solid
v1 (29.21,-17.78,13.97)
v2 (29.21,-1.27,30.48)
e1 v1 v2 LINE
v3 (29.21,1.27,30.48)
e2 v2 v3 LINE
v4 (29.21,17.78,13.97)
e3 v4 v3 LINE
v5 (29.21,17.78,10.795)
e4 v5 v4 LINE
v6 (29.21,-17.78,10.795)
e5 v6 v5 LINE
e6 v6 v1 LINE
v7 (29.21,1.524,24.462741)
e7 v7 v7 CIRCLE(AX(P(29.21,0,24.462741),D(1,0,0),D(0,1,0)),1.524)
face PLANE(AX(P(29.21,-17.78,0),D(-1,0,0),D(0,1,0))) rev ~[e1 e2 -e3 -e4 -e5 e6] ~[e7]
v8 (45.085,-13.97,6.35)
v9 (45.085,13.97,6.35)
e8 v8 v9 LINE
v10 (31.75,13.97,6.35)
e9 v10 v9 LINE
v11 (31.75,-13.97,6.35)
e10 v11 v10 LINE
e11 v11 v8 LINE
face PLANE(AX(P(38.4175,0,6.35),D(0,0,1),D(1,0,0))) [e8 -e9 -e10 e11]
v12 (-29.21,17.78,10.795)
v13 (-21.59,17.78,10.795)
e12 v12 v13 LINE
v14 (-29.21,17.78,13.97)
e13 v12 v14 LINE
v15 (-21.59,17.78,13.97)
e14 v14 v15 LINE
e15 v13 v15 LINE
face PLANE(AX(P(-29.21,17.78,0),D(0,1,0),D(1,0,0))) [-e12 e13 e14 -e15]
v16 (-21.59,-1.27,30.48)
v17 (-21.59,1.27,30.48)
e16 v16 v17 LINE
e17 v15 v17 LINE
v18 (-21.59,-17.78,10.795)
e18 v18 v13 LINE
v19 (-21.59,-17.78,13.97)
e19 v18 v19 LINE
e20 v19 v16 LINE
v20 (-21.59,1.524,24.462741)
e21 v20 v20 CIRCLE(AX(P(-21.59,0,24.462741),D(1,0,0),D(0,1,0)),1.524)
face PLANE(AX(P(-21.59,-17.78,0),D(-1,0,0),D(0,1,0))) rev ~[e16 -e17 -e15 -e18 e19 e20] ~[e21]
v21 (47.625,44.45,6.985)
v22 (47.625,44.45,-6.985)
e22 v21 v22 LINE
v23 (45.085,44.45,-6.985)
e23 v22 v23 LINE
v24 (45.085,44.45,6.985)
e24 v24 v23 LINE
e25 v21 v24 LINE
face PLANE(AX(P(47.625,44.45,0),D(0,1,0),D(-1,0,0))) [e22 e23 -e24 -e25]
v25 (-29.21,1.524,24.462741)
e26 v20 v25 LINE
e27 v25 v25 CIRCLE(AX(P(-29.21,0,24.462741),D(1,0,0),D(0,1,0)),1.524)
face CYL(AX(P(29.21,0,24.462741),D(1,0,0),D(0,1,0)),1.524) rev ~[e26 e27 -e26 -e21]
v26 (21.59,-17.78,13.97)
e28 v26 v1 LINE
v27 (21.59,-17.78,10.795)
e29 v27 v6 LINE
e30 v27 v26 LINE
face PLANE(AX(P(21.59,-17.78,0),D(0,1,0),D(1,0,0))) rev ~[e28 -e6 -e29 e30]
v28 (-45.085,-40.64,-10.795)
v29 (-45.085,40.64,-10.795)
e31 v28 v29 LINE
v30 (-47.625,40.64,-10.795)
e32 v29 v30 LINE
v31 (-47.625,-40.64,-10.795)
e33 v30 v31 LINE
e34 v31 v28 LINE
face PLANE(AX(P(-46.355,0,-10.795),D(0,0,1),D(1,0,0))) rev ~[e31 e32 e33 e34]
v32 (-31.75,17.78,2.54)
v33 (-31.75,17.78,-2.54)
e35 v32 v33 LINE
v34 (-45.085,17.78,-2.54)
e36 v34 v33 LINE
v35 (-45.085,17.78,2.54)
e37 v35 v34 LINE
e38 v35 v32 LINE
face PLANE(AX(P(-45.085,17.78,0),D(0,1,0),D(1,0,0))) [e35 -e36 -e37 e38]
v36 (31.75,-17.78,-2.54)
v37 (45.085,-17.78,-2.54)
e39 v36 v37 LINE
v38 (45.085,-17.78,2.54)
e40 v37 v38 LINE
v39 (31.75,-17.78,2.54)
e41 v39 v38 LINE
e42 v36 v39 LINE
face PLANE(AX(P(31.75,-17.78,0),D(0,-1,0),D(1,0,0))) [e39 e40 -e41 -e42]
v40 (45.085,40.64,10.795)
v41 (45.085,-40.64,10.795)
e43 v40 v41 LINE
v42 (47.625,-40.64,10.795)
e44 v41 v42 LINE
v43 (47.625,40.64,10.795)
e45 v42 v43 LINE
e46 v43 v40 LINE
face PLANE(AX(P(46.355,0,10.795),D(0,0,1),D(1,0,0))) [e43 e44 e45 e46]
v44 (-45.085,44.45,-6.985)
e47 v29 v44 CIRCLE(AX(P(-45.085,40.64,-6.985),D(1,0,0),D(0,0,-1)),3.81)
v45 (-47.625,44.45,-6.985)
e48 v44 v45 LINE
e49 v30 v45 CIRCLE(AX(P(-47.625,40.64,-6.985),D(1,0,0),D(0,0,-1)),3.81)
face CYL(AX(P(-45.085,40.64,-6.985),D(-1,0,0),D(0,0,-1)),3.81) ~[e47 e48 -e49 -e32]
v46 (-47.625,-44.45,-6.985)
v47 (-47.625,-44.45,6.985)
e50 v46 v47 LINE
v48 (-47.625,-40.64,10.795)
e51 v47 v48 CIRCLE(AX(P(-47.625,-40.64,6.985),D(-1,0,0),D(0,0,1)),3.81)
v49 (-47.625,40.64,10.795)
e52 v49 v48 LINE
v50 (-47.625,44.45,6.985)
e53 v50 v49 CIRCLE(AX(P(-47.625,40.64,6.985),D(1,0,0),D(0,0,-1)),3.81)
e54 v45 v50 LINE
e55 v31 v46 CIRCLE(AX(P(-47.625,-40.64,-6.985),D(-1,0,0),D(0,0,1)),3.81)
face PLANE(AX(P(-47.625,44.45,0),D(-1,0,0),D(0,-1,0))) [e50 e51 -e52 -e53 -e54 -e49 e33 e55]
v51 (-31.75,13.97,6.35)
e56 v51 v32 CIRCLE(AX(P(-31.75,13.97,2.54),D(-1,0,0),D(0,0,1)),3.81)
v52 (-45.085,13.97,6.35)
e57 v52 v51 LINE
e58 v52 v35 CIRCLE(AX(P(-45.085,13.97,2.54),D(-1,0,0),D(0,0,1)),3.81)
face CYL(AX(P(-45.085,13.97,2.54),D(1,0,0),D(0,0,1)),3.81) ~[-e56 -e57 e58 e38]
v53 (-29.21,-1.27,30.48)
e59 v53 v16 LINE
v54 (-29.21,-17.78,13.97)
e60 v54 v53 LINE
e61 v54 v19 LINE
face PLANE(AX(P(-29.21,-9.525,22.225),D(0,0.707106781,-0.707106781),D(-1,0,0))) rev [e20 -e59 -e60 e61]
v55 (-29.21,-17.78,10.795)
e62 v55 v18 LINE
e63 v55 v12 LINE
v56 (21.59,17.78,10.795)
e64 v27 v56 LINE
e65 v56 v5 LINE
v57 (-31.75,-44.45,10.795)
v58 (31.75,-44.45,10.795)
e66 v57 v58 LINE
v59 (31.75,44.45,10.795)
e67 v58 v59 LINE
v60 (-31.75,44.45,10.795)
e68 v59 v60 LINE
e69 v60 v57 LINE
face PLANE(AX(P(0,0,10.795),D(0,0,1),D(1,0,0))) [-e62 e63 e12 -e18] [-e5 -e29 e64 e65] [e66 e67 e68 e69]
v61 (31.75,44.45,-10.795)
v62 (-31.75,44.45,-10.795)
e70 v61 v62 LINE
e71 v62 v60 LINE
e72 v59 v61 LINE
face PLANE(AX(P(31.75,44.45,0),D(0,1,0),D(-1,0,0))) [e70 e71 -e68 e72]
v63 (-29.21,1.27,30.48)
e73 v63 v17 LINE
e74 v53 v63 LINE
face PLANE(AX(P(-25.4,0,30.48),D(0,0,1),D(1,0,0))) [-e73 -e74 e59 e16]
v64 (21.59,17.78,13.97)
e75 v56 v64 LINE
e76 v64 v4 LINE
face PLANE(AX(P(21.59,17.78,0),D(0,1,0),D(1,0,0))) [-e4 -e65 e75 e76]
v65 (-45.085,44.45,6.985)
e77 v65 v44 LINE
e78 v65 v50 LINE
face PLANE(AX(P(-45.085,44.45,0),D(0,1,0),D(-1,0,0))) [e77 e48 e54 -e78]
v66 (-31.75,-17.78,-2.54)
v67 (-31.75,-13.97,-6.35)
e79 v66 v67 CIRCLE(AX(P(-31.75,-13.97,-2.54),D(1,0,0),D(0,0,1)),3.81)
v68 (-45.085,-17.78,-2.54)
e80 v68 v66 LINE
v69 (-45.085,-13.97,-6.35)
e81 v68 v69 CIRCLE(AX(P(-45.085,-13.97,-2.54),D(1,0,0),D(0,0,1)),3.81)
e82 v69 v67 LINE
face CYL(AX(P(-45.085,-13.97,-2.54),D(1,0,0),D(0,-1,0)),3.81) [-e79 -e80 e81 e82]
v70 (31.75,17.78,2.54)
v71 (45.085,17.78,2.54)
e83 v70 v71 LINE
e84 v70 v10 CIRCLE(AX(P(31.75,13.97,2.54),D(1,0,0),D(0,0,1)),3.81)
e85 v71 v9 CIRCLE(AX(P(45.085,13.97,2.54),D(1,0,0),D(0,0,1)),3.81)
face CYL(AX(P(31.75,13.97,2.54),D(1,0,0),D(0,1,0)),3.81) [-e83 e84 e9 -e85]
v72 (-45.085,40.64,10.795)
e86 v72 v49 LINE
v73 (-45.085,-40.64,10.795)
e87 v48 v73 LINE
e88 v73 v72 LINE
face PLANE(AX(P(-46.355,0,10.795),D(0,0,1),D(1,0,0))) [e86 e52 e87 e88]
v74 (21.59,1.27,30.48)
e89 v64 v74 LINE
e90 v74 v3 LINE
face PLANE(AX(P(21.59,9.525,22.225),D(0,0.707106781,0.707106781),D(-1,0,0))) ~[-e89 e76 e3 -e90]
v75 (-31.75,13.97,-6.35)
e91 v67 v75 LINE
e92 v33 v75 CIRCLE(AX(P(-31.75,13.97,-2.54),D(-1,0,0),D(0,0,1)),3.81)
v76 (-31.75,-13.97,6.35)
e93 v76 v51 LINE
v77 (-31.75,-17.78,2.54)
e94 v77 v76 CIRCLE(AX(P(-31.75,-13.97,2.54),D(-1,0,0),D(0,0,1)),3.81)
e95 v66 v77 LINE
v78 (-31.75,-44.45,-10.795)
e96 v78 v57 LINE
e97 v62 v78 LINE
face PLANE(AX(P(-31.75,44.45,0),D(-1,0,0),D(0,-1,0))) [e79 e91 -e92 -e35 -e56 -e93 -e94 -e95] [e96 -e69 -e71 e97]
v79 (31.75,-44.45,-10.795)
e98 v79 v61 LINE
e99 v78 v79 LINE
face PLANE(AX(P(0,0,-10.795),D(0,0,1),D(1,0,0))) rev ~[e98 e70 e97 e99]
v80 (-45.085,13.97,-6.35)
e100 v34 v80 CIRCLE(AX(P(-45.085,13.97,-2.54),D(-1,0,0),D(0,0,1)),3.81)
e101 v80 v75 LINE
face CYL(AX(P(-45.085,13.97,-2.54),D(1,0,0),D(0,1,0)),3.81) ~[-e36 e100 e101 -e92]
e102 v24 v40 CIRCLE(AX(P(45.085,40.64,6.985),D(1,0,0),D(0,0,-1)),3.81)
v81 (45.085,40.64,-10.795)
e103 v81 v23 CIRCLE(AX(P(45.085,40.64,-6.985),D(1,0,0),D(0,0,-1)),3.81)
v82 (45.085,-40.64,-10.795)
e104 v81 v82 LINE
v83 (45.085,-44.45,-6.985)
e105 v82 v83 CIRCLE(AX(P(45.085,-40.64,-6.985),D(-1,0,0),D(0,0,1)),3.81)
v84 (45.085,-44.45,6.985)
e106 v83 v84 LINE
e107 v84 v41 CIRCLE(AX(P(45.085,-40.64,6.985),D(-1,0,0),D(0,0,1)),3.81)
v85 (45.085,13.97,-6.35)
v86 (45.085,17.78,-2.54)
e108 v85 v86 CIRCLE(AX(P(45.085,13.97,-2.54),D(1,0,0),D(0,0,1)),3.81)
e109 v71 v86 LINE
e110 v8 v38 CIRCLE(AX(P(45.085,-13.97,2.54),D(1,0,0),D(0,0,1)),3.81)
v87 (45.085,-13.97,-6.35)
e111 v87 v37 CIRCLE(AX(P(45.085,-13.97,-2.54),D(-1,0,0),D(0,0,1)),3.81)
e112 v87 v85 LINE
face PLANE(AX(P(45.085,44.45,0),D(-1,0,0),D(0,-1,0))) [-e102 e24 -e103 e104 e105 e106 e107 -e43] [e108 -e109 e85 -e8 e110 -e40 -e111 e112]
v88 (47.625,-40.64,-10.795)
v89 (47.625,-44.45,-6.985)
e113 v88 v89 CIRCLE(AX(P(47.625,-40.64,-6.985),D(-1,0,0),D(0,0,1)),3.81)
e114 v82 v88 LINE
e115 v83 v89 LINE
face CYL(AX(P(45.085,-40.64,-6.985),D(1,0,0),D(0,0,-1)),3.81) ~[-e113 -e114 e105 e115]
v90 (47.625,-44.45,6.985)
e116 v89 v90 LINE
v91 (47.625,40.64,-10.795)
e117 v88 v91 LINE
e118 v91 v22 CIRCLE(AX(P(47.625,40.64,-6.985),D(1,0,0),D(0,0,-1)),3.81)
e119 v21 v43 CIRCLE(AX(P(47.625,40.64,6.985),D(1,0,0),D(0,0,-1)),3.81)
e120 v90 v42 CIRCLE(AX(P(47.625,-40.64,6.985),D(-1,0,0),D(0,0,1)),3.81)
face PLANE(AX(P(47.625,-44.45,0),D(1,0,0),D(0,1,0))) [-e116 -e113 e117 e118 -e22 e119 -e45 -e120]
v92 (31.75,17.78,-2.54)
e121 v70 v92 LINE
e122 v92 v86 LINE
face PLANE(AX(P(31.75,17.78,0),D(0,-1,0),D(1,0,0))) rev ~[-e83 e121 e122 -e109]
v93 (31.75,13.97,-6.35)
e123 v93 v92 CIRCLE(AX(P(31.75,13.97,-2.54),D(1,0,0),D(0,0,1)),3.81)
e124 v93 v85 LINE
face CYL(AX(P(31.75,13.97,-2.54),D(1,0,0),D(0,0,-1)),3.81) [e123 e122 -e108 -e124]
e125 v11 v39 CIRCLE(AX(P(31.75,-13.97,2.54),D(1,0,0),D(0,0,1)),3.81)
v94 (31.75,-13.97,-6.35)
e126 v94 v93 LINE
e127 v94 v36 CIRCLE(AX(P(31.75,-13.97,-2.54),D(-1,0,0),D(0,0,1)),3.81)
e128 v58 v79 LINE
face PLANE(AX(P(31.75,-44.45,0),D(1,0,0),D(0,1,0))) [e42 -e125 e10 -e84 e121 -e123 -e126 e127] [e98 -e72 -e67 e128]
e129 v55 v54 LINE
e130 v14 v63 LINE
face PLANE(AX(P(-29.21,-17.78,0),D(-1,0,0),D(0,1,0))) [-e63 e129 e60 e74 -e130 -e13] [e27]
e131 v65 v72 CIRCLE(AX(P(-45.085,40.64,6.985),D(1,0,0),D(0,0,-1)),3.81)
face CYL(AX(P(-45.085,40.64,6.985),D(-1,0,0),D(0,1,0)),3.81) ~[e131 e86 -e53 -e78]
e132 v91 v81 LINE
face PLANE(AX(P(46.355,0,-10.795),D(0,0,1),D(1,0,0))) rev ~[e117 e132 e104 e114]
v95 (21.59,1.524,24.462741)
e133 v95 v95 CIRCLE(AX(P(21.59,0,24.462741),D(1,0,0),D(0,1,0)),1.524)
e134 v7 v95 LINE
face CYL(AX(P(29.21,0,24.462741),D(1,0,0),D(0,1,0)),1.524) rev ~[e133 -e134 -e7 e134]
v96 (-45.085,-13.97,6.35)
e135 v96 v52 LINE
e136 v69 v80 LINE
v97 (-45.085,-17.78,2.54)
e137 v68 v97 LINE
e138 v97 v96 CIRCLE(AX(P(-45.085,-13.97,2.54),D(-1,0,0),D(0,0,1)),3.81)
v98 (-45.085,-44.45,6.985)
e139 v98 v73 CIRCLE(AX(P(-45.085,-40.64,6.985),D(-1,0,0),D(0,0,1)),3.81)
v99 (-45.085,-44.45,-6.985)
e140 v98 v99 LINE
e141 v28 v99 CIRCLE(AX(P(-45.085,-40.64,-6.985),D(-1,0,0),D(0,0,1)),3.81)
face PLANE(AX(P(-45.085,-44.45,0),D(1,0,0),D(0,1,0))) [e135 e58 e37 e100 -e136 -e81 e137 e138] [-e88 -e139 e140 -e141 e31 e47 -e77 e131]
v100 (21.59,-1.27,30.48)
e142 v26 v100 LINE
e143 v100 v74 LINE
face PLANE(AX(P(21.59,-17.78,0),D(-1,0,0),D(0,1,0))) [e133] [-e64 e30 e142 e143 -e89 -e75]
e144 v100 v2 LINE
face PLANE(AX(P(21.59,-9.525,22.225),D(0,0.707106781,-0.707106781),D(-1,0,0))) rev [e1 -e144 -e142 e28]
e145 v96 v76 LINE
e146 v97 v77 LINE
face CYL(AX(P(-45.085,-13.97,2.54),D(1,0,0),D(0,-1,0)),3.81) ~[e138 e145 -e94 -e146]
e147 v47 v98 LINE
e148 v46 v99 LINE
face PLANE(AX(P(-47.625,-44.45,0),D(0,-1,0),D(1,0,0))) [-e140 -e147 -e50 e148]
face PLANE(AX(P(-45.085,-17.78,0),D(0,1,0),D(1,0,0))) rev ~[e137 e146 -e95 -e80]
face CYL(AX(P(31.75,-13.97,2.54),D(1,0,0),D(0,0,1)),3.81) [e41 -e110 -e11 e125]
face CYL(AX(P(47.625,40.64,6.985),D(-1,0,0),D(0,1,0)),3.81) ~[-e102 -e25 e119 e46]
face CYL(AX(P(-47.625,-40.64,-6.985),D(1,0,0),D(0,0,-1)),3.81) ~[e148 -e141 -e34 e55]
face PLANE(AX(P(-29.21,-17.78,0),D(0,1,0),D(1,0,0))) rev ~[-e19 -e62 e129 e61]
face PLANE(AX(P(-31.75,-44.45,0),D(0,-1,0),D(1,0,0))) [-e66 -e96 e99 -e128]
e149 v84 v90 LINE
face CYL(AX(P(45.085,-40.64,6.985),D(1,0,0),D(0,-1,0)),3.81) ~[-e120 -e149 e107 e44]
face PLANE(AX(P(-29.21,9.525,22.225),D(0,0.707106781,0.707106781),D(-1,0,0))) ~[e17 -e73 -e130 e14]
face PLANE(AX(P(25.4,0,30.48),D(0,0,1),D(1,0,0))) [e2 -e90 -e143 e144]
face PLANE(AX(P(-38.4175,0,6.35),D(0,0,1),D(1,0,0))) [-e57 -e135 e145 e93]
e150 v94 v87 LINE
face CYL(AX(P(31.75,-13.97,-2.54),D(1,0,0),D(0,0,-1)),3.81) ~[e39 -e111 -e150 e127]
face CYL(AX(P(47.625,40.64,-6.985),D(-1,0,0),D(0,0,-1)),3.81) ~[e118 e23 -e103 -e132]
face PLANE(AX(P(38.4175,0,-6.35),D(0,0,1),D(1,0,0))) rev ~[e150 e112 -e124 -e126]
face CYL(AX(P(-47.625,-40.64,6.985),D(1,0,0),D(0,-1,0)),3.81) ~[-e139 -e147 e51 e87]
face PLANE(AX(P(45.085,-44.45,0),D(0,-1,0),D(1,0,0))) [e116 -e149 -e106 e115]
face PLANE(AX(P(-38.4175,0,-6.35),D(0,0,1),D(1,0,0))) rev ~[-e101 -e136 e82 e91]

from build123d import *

# Parameters (mm, degrees)
F0_W     = 7.62
F0_H     = 35.56
F1_DEPTH = 10.795
F0_W_2   = 13.335
F2_DEPTH = 6.35
F3_DEPTH = 10.795
F4_DEPTH = 30.48
F5_R     = 3.81
F6_SIZE  = 16.51
F7_R     = 1.524
F8_DEPTH = 76.836
F9_R     = 3.81


# Not quite as in the source:
# - a feature names something its author has since deleted; it is built from what else it names


with BuildPart() as f1:
    # F0 (on Top) → F1 (new body, symmetric)
    with BuildSketch(Plane.XY):
        Polygon((31.75, 44.45), (-31.75, 44.45), (-31.75, 17.78), (-31.75, -17.78), (-31.75, -44.45), (-29.21, -44.45), (31.75, -44.45), (31.75, -31.7187323975), (31.75, -17.78), (31.75, 17.78), align=None)
        with Locations((-25.4, 0)):
            Rectangle(F0_W, F0_H, mode=Mode.SUBTRACT)
        with Locations((25.4, 0)):
            Rectangle(F0_W, F0_H, mode=Mode.SUBTRACT)
    extrude(amount=F1_DEPTH, both=True)



with BuildPart() as f1b:
    # F0 (on Top) → F1, piece 2 (new body, symmetric)
    with BuildSketch(Plane.XY):
        Polygon((-45.085, -17.78), (-45.085, 17.78), (-45.085, 44.45), (-47.625, 44.45), (-47.625, -31.75), (-47.625, -44.45), (-45.085, -44.45), align=None)
    extrude(amount=F1_DEPTH, both=True)


with BuildPart() as f1c:
    # F0 (on Top) → F1, piece 3 (new body, symmetric)
    with BuildSketch(Plane.XY):
        Polygon((45.085, 44.45), (45.085, 17.78), (45.085, -17.78), (45.085, -44.45), (47.625, -44.45), (47.625, -31.75), (47.625, 44.45), align=None)
    extrude(amount=F1_DEPTH, both=True)


with BuildPart() as f1_1:
    add(f1.part)

    add(f1b.part)  # F2 merges F1b

    add(f1c.part)  # F2 merges F1c
    # F0 (on Top) → F2 (join, symmetric)
    with BuildSketch(Plane.XY):
        with Locations((-38.4175, 0)):
            Rectangle(F0_W_2, F0_H)
        with Locations((38.4175, 0)):
            Rectangle(F0_W_2, F0_H)
    extrude(amount=F2_DEPTH, both=True)

    # F0 (on Top) → F3 (join)
    with BuildSketch(Plane.XY):
        with Locations((25.4, 0)):
            Rectangle(F0_W, F0_H)
        with Locations((-25.4, 0)):
            Rectangle(F0_W, F0_H)
    extrude(amount=-F3_DEPTH)

    # F0 (on Top) → F4 (join)
    with BuildSketch(Plane.XY):
        with Locations((25.4, 0)):
            Rectangle(F0_W, F0_H)
        with Locations((-25.4, 0)):
            Rectangle(F0_W, F0_H)
    extrude(amount=F4_DEPTH)

    # F5
    f5_edges = [f1_1.edges().sort_by_distance(p)[0] for p in [
        (38.4175, -17.78, 6.35),
        (38.4175, -17.78, -6.35),
        (38.4175, 17.78, 6.35),
        (38.4175, 17.78, -6.35),
        (-38.4175, 17.78, -6.35),
        (-38.4175, -17.78, -6.35),
        (-38.4175, 17.78, 6.35),
        (-38.4175, -17.78, 6.35),
    ]]
    fillet(f5_edges, radius=F5_R)

    # F6
    f6_edges = [f1_1.edges().sort_by_distance(p)[0] for p in [
        (25.4, 17.78, 30.48),
        (-25.4, 17.78, 30.48),
        (25.4, -17.78, 30.48),
        (-25.4, -17.78, 30.48),
    ]]
    chamfer(f6_edges, length=F6_SIZE)

    # F7 (on face) → F8 (cut, through all)
    with BuildSketch(Plane.YZ.offset(29.21)):
        with Locations((0, 24.4627408683)):
            Circle(F7_R)
    extrude(amount=-F8_DEPTH, mode=Mode.SUBTRACT)

    # F9
    f9_edges = [f1_1.edges().sort_by_distance(p)[0] for p in [
        (46.355, 44.45, 10.795),
        (-46.355, 44.45, 10.795),
        (-46.355, 44.45, -10.795),
        (46.355, 44.45, -10.795),
        (-46.355, -44.45, 10.795),
        (-46.355, -44.45, -10.795),
        (46.355, -44.45, -10.795),
        (46.355, -44.45, 10.795),
    ]]
    fillet(f9_edges, radius=F9_R)


solid = f1_1.part
